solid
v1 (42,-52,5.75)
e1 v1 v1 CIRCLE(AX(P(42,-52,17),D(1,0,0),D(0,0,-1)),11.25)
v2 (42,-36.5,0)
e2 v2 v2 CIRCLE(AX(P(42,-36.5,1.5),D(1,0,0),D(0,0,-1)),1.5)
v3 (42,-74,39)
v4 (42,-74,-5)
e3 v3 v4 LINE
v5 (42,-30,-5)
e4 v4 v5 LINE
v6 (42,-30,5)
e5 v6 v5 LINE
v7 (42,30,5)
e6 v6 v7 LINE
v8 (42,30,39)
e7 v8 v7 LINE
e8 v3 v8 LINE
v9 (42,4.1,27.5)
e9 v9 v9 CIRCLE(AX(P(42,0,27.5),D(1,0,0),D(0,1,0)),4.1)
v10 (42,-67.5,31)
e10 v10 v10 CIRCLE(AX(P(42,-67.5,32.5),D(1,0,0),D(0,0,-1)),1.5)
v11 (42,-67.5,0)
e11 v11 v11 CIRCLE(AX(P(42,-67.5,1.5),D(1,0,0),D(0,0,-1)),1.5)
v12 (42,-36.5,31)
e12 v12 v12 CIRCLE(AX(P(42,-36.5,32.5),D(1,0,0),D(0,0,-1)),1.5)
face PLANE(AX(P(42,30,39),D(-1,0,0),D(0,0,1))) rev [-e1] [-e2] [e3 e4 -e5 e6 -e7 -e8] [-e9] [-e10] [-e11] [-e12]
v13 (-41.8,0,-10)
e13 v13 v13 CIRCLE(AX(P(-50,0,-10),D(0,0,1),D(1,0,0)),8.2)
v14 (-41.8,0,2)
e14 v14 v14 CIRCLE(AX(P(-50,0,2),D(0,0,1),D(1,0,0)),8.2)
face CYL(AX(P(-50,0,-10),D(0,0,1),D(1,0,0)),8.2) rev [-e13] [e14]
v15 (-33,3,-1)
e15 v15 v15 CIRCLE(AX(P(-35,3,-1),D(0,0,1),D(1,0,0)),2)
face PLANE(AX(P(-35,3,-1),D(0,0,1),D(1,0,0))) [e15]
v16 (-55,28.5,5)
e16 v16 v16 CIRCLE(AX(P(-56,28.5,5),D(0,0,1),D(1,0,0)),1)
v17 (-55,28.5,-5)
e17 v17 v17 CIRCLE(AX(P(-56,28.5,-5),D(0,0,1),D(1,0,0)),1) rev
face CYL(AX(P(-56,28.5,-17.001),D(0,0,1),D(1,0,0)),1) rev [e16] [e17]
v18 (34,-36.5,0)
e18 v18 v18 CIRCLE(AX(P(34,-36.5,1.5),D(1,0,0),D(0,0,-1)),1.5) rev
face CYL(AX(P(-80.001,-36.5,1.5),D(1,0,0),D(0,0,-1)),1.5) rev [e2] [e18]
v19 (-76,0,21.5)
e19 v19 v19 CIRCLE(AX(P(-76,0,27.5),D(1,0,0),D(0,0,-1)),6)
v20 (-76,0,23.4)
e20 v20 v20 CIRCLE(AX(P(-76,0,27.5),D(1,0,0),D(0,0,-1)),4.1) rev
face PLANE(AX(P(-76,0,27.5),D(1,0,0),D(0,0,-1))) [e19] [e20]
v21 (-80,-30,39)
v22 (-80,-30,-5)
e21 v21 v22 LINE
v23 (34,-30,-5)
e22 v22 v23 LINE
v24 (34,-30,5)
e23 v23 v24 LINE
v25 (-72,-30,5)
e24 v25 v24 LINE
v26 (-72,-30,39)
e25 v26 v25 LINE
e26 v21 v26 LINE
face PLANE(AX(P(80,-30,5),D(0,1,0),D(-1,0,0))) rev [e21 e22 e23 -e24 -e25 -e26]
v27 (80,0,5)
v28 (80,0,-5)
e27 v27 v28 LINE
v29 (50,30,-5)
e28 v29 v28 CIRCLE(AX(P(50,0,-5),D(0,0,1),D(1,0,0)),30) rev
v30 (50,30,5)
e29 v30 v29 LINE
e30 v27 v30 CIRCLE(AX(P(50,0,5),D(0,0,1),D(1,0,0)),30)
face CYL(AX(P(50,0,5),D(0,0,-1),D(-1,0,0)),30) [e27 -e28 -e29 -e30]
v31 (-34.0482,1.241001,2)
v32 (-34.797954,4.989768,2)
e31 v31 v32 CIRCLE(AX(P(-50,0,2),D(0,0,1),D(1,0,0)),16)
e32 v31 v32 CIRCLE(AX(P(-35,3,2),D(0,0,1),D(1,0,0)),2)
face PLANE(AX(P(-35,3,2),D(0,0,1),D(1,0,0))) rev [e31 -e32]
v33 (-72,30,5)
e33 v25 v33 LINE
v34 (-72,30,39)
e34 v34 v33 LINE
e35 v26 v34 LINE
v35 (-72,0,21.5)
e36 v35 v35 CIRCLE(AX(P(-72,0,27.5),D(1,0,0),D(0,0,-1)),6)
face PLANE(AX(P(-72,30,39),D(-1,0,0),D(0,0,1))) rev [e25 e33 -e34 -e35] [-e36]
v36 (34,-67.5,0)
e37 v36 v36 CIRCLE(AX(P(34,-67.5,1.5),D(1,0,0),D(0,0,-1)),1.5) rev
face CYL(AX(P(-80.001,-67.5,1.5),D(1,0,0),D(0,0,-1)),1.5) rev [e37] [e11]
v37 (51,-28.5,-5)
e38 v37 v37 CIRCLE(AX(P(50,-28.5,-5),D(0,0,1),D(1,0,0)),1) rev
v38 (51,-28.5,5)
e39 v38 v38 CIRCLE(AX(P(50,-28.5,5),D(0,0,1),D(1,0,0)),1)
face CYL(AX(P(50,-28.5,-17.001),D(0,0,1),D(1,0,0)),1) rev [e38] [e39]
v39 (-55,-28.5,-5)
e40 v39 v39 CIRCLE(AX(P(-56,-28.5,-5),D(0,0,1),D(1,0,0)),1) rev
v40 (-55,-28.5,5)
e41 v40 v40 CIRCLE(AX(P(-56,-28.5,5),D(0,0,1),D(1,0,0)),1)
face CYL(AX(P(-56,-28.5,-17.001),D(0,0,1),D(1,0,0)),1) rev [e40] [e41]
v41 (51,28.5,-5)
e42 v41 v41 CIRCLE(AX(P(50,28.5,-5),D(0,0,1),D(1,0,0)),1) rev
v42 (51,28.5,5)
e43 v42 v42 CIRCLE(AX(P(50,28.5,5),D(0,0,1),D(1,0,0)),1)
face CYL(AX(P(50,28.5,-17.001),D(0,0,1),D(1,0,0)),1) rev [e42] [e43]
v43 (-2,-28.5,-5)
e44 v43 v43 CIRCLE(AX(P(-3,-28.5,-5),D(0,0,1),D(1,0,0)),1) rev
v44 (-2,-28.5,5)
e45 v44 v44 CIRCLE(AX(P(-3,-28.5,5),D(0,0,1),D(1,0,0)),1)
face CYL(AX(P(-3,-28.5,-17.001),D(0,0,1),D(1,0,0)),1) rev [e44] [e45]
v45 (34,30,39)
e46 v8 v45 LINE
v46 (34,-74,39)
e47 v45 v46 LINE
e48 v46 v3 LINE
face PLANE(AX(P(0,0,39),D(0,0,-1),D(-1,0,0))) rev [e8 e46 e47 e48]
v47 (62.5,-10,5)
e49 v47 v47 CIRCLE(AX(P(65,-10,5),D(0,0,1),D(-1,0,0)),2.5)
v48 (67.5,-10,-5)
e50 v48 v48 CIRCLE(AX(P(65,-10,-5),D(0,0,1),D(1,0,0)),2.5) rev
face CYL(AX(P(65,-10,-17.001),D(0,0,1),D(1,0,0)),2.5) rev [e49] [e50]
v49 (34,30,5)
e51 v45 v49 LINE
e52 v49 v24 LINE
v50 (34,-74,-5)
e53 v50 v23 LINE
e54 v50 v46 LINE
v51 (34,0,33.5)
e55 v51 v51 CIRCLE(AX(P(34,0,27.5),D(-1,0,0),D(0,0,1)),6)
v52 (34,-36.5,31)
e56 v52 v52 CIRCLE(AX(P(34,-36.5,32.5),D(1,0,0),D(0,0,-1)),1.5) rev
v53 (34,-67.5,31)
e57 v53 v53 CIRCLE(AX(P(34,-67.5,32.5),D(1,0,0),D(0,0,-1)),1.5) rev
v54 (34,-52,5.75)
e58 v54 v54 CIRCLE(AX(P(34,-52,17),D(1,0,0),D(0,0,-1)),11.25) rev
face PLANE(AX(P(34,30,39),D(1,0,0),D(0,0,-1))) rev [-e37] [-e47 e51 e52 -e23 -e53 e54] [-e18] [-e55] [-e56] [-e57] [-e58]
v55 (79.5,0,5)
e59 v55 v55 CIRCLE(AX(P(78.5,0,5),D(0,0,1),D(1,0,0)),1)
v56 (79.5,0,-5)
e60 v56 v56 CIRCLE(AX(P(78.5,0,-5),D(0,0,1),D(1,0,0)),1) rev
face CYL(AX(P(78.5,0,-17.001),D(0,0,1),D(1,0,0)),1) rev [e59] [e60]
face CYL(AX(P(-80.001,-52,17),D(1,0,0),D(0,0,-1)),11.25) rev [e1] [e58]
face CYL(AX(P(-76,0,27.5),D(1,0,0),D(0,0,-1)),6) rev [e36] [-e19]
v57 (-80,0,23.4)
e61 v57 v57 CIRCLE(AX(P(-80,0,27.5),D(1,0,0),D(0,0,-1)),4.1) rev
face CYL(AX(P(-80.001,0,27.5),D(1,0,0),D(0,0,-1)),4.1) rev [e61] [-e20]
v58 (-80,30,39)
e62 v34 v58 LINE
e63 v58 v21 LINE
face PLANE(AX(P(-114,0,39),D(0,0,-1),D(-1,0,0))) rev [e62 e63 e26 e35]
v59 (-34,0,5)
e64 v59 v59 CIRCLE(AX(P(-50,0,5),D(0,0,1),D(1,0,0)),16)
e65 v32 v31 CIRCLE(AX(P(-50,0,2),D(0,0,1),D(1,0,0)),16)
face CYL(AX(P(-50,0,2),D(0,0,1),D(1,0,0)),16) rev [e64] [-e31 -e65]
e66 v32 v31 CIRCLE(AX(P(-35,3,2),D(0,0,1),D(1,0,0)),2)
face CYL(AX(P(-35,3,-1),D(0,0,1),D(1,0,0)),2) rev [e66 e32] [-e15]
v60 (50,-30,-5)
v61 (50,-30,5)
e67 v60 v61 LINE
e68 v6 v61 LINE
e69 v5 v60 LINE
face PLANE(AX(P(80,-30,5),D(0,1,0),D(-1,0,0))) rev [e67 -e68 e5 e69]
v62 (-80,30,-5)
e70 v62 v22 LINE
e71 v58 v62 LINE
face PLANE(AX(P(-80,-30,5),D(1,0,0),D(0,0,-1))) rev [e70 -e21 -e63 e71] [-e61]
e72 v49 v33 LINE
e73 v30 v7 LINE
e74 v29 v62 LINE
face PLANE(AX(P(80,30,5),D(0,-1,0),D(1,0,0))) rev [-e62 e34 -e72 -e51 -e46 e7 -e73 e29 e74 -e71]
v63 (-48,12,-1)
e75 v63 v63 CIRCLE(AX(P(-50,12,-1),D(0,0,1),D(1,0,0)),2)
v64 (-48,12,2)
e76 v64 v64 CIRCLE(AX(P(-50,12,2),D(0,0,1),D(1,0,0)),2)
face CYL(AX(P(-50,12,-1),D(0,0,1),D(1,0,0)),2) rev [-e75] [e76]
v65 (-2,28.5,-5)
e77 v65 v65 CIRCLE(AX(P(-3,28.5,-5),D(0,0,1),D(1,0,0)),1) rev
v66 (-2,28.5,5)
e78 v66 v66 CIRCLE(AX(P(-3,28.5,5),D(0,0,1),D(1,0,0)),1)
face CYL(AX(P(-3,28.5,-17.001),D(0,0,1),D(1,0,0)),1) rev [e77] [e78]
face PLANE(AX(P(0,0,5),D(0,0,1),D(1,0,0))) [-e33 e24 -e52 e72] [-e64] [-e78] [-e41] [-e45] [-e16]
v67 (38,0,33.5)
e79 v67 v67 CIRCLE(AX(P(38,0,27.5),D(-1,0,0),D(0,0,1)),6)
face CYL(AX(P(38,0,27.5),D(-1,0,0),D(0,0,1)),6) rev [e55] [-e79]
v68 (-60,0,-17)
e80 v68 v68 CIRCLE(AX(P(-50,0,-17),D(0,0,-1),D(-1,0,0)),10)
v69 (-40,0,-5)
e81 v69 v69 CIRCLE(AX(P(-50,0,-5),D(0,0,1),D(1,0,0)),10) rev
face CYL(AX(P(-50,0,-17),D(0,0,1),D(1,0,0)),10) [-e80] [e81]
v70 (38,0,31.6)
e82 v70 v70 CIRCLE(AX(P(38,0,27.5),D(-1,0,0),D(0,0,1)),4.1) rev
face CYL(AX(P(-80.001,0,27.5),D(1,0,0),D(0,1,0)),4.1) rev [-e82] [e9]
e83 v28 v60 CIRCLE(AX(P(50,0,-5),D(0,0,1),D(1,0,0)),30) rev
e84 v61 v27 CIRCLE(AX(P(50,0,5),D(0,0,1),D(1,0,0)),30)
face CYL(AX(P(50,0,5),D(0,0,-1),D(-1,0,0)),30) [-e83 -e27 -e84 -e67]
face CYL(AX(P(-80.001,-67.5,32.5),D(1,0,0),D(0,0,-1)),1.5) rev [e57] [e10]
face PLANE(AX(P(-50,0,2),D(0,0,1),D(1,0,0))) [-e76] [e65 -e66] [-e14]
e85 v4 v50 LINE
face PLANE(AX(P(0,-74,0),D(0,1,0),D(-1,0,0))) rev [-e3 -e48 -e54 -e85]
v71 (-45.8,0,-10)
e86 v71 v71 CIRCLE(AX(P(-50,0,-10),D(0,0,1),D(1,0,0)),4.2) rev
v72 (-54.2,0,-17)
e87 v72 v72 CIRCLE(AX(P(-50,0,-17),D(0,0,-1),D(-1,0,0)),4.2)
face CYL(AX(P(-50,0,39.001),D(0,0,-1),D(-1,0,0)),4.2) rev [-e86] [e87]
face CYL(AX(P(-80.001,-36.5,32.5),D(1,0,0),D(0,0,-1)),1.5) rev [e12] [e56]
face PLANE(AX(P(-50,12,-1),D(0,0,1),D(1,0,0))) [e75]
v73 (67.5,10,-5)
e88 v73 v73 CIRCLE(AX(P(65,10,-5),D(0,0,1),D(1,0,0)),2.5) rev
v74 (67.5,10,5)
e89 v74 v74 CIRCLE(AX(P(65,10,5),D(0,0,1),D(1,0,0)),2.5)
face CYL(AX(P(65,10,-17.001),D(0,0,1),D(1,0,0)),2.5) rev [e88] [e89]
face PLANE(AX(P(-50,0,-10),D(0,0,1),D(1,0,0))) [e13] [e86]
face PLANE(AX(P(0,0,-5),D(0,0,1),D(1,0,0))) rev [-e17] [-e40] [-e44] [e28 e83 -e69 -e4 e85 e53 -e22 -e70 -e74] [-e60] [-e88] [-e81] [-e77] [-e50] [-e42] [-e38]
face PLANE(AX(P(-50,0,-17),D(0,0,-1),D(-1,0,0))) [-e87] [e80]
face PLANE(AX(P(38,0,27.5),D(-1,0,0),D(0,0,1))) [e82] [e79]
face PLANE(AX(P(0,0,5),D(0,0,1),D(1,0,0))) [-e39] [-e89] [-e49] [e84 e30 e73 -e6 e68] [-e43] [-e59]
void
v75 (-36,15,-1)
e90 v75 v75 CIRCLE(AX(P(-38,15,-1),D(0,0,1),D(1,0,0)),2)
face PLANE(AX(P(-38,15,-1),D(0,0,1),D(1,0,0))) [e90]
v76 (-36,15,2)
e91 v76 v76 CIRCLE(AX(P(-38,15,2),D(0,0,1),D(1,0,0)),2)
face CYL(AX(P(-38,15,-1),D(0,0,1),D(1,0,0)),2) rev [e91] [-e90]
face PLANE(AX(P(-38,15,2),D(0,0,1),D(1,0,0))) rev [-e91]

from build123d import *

# Parameters (mm, degrees)
SKETCH1_W           = 160
SKETCH1_H           = 60
BOSS_EXTRUDE1_DEPTH = 5
SKETCH4_W           = 8
SKETCH4_H           = 60
BOSS_EXTRUDE3_DEPTH = 34
CUT_EXTRUDE2_REACH  = 133.548
SKETCH5_R           = 4.1
SKETCH6_R           = 10
BOSS_EXTRUDE4_DEPTH = 12
CUT_EXTRUDE3_REACH  = 104.157
SKETCH7_R           = 4.2
LPATTERN1_COUNT     = 2
LPATTERN1_PITCH     = 114
CUT_EXTRUDE4_REACH  = 183.218
SKETCH8_R           = 4.1
CUT_EXTRUDE5_REACH  = 93.957
SKETCH9_R           = 2.5
FILLET1_R           = 30
CUT_EXTRUDE7_REACH  = 93.957
SKETCH12_R          = 1
SKETCH15_R          = 16
CUT_EXTRUDE11_DEPTH = 3
SKETCH16_R          = 8.2
CUT_EXTRUDE12_DEPTH = 12
SKETCH17_R          = 2
CUT_EXTRUDE13_DEPTH = 3
SKETCH18_W          = 8
SKETCH18_H          = 44
BOSS_EXTRUDE5_DEPTH = 44
CUT_EXTRUDE15_REACH = 149.922
SKETCH20_R          = 1.5
SKETCH20_R_2        = 11.25
SKETCH21_R          = 6
CUT_EXTRUDE16_DEPTH = 4
CUT_EXTRUDE17_START = -4
SKETCH22_R          = 6
CUT_EXTRUDE17_DEPTH = 4


with BuildPart() as part:
    # Sketch1 → Boss-Extrude1 (new, symmetric)
    with BuildSketch(Plane.XY):
        Rectangle(SKETCH1_W, SKETCH1_H)
    extrude(amount=BOSS_EXTRUDE1_DEPTH, both=True)

    # Sketch4 → Boss-Extrude3 (add)
    with BuildSketch(Plane.XY.offset(5)):
        with Locations((38, 0)):
            Rectangle(SKETCH4_W, SKETCH4_H)
    boss_extrude3 = extrude(amount=BOSS_EXTRUDE3_DEPTH)

    # Sketch5 → Cut-Extrude2 (cut, up to next)
    with BuildSketch(Plane(origin=(42, 0, 0), x_dir=(0, 0, -1), z_dir=(1, 0, 0)), mode=Mode.PRIVATE) as cut_extrude2_sk1:
        with Locations(Location((-27.5, 0, 0), (0, 0, 90))):
            Circle(SKETCH5_R)
    cut_extrude2_tool1 = extrude(cut_extrude2_sk1.sketch, amount=-CUT_EXTRUDE2_REACH, mode=Mode.PRIVATE) & part.part
    add(cut_extrude2_tool1.solids().sort_by_distance((42, 0, 27.5))[0], mode=Mode.SUBTRACT)

    # Sketch6 → Boss-Extrude4 (add)
    with BuildSketch(Plane(origin=(0, 0, -5), x_dir=(-1, 0, 0), z_dir=(0, 0, -1))):
        with Locations(Location((50, 0, 0), (0, 0, 180))):
            Circle(SKETCH6_R)
    extrude(amount=BOSS_EXTRUDE4_DEPTH)

    # Sketch7 → Cut-Extrude3 (cut, up to next)
    with BuildSketch(Plane(origin=(0, 0, -17), x_dir=(-1, 0, 0), z_dir=(0, 0, -1)), mode=Mode.PRIVATE) as cut_extrude3_sk1:
        with Locations((50, 0)):
            Circle(SKETCH7_R)
    cut_extrude3_tool1 = extrude(cut_extrude3_sk1.sketch, amount=-CUT_EXTRUDE3_REACH, mode=Mode.PRIVATE) & part.part
    add(cut_extrude3_tool1.solids().sort_by_distance((-50, 0, -17))[0], mode=Mode.SUBTRACT)

    # LPattern1: Boss-Extrude3 ×2
    with Locations(*[(-i * LPATTERN1_PITCH, 0, 0) for i in range(1, LPATTERN1_COUNT)]):
        add(boss_extrude3)

    # Sketch8 → Cut-Extrude4 (cut, up to next)
    with BuildSketch(Plane(origin=(-72, 0, -55), x_dir=(0, 0, -1), z_dir=(1, 0, 0)), mode=Mode.PRIVATE) as cut_extrude4_sk1:
        with Locations(Location((-82.5, 0, 0), (0, 0, 90))):
            Circle(SKETCH8_R)
    cut_extrude4_tool1 = extrude(cut_extrude4_sk1.sketch, amount=-CUT_EXTRUDE4_REACH, mode=Mode.PRIVATE) & part.part
    add(cut_extrude4_tool1.solids().sort_by_distance((-72, 0, 27.5))[0], mode=Mode.SUBTRACT)

    # Sketch9 → Cut-Extrude5 (cut, up to next)
    with BuildSketch(Plane.XY.offset(5), mode=Mode.PRIVATE) as cut_extrude5_sk1:
        with Locations((65, 10)):
            Circle(SKETCH9_R)
    cut_extrude5_tool1 = extrude(cut_extrude5_sk1.sketch, amount=-CUT_EXTRUDE5_REACH, mode=Mode.PRIVATE) & part.part
    # Sketch9 → Cut-Extrude5 (cut, up to next)
    with BuildSketch(Plane.XY.offset(5), mode=Mode.PRIVATE) as cut_extrude5_sk2:
        with Locations((65, -10)):
            Circle(SKETCH9_R)
    cut_extrude5_tool2 = extrude(cut_extrude5_sk2.sketch, amount=-CUT_EXTRUDE5_REACH, mode=Mode.PRIVATE) & part.part
    add(cut_extrude5_tool1.solids().sort_by_distance((65, 10, 5))[0], mode=Mode.SUBTRACT)
    add(cut_extrude5_tool2.solids().sort_by_distance((65, -10, 5))[0], mode=Mode.SUBTRACT)

    # Fillet1
    fillet1_edges = [part.edges().sort_by_distance(p)[0] for p in [
        (80, 30, 0),
        (80, -30, 0),
    ]]
    fillet(fillet1_edges, radius=FILLET1_R - 0.0001)  # a hair under: the kernel refuses the full size

    # Sketch12 → Cut-Extrude7 (cut, up to next)
    with BuildSketch(Plane.XY.offset(5), mode=Mode.PRIVATE) as cut_extrude7_sk1:
        with Locations((-3, 28.5)):
            Circle(SKETCH12_R)
    cut_extrude7_tool1 = extrude(cut_extrude7_sk1.sketch, amount=-CUT_EXTRUDE7_REACH, mode=Mode.PRIVATE) & part.part
    # Sketch12 → Cut-Extrude7 (cut, up to next)
    with BuildSketch(Plane.XY.offset(5), mode=Mode.PRIVATE) as cut_extrude7_sk2:
        with Locations((-56, 28.5)):
            Circle(SKETCH12_R)
    cut_extrude7_tool2 = extrude(cut_extrude7_sk2.sketch, amount=-CUT_EXTRUDE7_REACH, mode=Mode.PRIVATE) & part.part
    # Sketch12 → Cut-Extrude7 (cut, up to next)
    with BuildSketch(Plane.XY.offset(5), mode=Mode.PRIVATE) as cut_extrude7_sk3:
        with Locations((78.5, 0)):
            Circle(SKETCH12_R)
    cut_extrude7_tool3 = extrude(cut_extrude7_sk3.sketch, amount=-CUT_EXTRUDE7_REACH, mode=Mode.PRIVATE) & part.part
    # Sketch12 → Cut-Extrude7 (cut, up to next)
    with BuildSketch(Plane.XY.offset(5), mode=Mode.PRIVATE) as cut_extrude7_sk4:
        with Locations((50, 28.5)):
            Circle(SKETCH12_R)
    cut_extrude7_tool4 = extrude(cut_extrude7_sk4.sketch, amount=-CUT_EXTRUDE7_REACH, mode=Mode.PRIVATE) & part.part
    # Sketch12 → Cut-Extrude7 (cut, up to next)
    with BuildSketch(Plane.XY.offset(5), mode=Mode.PRIVATE) as cut_extrude7_sk5:
        with Locations((-3, -28.5)):
            Circle(SKETCH12_R)
    cut_extrude7_tool5 = extrude(cut_extrude7_sk5.sketch, amount=-CUT_EXTRUDE7_REACH, mode=Mode.PRIVATE) & part.part
    # Sketch12 → Cut-Extrude7 (cut, up to next)
    with BuildSketch(Plane.XY.offset(5), mode=Mode.PRIVATE) as cut_extrude7_sk6:
        with Locations((-56, -28.5)):
            Circle(SKETCH12_R)
    cut_extrude7_tool6 = extrude(cut_extrude7_sk6.sketch, amount=-CUT_EXTRUDE7_REACH, mode=Mode.PRIVATE) & part.part
    # Sketch12 → Cut-Extrude7 (cut, up to next)
    with BuildSketch(Plane.XY.offset(5), mode=Mode.PRIVATE) as cut_extrude7_sk7:
        with Locations((50, -28.5)):
            Circle(SKETCH12_R)
    cut_extrude7_tool7 = extrude(cut_extrude7_sk7.sketch, amount=-CUT_EXTRUDE7_REACH, mode=Mode.PRIVATE) & part.part
    add(cut_extrude7_tool1.solids().sort_by_distance((-3, 28.5, 5))[0], mode=Mode.SUBTRACT)
    add(cut_extrude7_tool2.solids().sort_by_distance((-56, 28.5, 5))[0], mode=Mode.SUBTRACT)
    add(cut_extrude7_tool3.solids().sort_by_distance((78.5, 0, 5))[0], mode=Mode.SUBTRACT)
    add(cut_extrude7_tool4.solids().sort_by_distance((50, 28.5, 5))[0], mode=Mode.SUBTRACT)
    add(cut_extrude7_tool5.solids().sort_by_distance((-3, -28.5, 5))[0], mode=Mode.SUBTRACT)
    add(cut_extrude7_tool6.solids().sort_by_distance((-56, -28.5, 5))[0], mode=Mode.SUBTRACT)
    add(cut_extrude7_tool7.solids().sort_by_distance((50, -28.5, 5))[0], mode=Mode.SUBTRACT)

    # Sketch15 → Cut-Extrude11 (cut)
    with BuildSketch(Plane.XY.offset(5)):
        with Locations((-50, 0)):
            Circle(SKETCH15_R)
    extrude(amount=-CUT_EXTRUDE11_DEPTH, mode=Mode.SUBTRACT)

    # Sketch16 → Cut-Extrude12 (cut)
    with BuildSketch(Plane.XY.offset(2)):
        with Locations((-50, 0)):
            Circle(SKETCH16_R)
    extrude(amount=-CUT_EXTRUDE12_DEPTH, mode=Mode.SUBTRACT)

    # Sketch17 → Cut-Extrude13 (cut)
    with BuildSketch(Plane.XY.offset(2)):
        with Locations((-50, 12)):
            Circle(SKETCH17_R)
        with Locations((-38, 15)):
            Circle(SKETCH17_R)
        with Locations((-35, 3)):
            Circle(SKETCH17_R)
        with Locations((-47, 0)):
            Circle(SKETCH17_R)
    extrude(amount=-CUT_EXTRUDE13_DEPTH, mode=Mode.SUBTRACT)

    # Sketch18 → Boss-Extrude5 (add)
    with BuildSketch(Plane(origin=(0, -30, 0), x_dir=(1, 0, 0), z_dir=(0, 1, 0))):
        with Locations((38, -17)):
            Rectangle(SKETCH18_W, SKETCH18_H)
    extrude(amount=-BOSS_EXTRUDE5_DEPTH)

    # Sketch20 → Cut-Extrude15 (cut, up to next)
    with BuildSketch(Plane(origin=(42, 0, 0), x_dir=(0, 0, -1), z_dir=(1, 0, 0)), mode=Mode.PRIVATE) as cut_extrude15_sk1:
        with Locations((-32.5, -36.5)):
            Circle(SKETCH20_R)
    cut_extrude15_tool1 = extrude(cut_extrude15_sk1.sketch, amount=-CUT_EXTRUDE15_REACH, mode=Mode.PRIVATE) & part.part
    # Sketch20 → Cut-Extrude15 (cut, up to next)
    with BuildSketch(Plane(origin=(42, 0, 0), x_dir=(0, 0, -1), z_dir=(1, 0, 0)), mode=Mode.PRIVATE) as cut_extrude15_sk2:
        with Locations((-1.5, -36.5)):
            Circle(SKETCH20_R)
    cut_extrude15_tool2 = extrude(cut_extrude15_sk2.sketch, amount=-CUT_EXTRUDE15_REACH, mode=Mode.PRIVATE) & part.part
    # Sketch20 → Cut-Extrude15 (cut, up to next)
    with BuildSketch(Plane(origin=(42, 0, 0), x_dir=(0, 0, -1), z_dir=(1, 0, 0)), mode=Mode.PRIVATE) as cut_extrude15_sk3:
        with Locations((-1.5, -67.5)):
            Circle(SKETCH20_R)
    cut_extrude15_tool3 = extrude(cut_extrude15_sk3.sketch, amount=-CUT_EXTRUDE15_REACH, mode=Mode.PRIVATE) & part.part
    # Sketch20 → Cut-Extrude15 (cut, up to next)
    with BuildSketch(Plane(origin=(42, 0, 0), x_dir=(0, 0, -1), z_dir=(1, 0, 0)), mode=Mode.PRIVATE) as cut_extrude15_sk4:
        with Locations((-32.5, -67.5)):
            Circle(SKETCH20_R)
    cut_extrude15_tool4 = extrude(cut_extrude15_sk4.sketch, amount=-CUT_EXTRUDE15_REACH, mode=Mode.PRIVATE) & part.part
    # Sketch20 → Cut-Extrude15 (cut, up to next)
    with BuildSketch(Plane(origin=(42, 0, 0), x_dir=(0, 0, -1), z_dir=(1, 0, 0)), mode=Mode.PRIVATE) as cut_extrude15_sk5:
        with Locations((-17, -52)):
            Circle(SKETCH20_R_2)
    cut_extrude15_tool5 = extrude(cut_extrude15_sk5.sketch, amount=-CUT_EXTRUDE15_REACH, mode=Mode.PRIVATE) & part.part
    add(cut_extrude15_tool1.solids().sort_by_distance((42, -36.5, 32.5))[0], mode=Mode.SUBTRACT)
    add(cut_extrude15_tool2.solids().sort_by_distance((42, -36.5, 1.5))[0], mode=Mode.SUBTRACT)
    add(cut_extrude15_tool3.solids().sort_by_distance((42, -67.5, 1.5))[0], mode=Mode.SUBTRACT)
    add(cut_extrude15_tool4.solids().sort_by_distance((42, -67.5, 32.5))[0], mode=Mode.SUBTRACT)
    add(cut_extrude15_tool5.solids().sort_by_distance((42, -52, 17))[0], mode=Mode.SUBTRACT)

    # Sketch21 → Cut-Extrude16 (cut)
    with BuildSketch(Plane(origin=(-72, 0, 0), x_dir=(0, 0, -1), z_dir=(1, 0, 0))):
        with Locations((-27.5, 0)):
            Circle(SKETCH21_R)
    extrude(amount=-CUT_EXTRUDE16_DEPTH, mode=Mode.SUBTRACT)

    # Sketch22 → Cut-Extrude17 (cut)
    with BuildSketch(Plane.ZY.offset(-34).offset(CUT_EXTRUDE17_START)):
        with Locations(Location((27.5, 0, 0), (0, 0, 180))):
            Circle(SKETCH22_R)
    extrude(amount=CUT_EXTRUDE17_DEPTH, mode=Mode.SUBTRACT)


solid = part.part
